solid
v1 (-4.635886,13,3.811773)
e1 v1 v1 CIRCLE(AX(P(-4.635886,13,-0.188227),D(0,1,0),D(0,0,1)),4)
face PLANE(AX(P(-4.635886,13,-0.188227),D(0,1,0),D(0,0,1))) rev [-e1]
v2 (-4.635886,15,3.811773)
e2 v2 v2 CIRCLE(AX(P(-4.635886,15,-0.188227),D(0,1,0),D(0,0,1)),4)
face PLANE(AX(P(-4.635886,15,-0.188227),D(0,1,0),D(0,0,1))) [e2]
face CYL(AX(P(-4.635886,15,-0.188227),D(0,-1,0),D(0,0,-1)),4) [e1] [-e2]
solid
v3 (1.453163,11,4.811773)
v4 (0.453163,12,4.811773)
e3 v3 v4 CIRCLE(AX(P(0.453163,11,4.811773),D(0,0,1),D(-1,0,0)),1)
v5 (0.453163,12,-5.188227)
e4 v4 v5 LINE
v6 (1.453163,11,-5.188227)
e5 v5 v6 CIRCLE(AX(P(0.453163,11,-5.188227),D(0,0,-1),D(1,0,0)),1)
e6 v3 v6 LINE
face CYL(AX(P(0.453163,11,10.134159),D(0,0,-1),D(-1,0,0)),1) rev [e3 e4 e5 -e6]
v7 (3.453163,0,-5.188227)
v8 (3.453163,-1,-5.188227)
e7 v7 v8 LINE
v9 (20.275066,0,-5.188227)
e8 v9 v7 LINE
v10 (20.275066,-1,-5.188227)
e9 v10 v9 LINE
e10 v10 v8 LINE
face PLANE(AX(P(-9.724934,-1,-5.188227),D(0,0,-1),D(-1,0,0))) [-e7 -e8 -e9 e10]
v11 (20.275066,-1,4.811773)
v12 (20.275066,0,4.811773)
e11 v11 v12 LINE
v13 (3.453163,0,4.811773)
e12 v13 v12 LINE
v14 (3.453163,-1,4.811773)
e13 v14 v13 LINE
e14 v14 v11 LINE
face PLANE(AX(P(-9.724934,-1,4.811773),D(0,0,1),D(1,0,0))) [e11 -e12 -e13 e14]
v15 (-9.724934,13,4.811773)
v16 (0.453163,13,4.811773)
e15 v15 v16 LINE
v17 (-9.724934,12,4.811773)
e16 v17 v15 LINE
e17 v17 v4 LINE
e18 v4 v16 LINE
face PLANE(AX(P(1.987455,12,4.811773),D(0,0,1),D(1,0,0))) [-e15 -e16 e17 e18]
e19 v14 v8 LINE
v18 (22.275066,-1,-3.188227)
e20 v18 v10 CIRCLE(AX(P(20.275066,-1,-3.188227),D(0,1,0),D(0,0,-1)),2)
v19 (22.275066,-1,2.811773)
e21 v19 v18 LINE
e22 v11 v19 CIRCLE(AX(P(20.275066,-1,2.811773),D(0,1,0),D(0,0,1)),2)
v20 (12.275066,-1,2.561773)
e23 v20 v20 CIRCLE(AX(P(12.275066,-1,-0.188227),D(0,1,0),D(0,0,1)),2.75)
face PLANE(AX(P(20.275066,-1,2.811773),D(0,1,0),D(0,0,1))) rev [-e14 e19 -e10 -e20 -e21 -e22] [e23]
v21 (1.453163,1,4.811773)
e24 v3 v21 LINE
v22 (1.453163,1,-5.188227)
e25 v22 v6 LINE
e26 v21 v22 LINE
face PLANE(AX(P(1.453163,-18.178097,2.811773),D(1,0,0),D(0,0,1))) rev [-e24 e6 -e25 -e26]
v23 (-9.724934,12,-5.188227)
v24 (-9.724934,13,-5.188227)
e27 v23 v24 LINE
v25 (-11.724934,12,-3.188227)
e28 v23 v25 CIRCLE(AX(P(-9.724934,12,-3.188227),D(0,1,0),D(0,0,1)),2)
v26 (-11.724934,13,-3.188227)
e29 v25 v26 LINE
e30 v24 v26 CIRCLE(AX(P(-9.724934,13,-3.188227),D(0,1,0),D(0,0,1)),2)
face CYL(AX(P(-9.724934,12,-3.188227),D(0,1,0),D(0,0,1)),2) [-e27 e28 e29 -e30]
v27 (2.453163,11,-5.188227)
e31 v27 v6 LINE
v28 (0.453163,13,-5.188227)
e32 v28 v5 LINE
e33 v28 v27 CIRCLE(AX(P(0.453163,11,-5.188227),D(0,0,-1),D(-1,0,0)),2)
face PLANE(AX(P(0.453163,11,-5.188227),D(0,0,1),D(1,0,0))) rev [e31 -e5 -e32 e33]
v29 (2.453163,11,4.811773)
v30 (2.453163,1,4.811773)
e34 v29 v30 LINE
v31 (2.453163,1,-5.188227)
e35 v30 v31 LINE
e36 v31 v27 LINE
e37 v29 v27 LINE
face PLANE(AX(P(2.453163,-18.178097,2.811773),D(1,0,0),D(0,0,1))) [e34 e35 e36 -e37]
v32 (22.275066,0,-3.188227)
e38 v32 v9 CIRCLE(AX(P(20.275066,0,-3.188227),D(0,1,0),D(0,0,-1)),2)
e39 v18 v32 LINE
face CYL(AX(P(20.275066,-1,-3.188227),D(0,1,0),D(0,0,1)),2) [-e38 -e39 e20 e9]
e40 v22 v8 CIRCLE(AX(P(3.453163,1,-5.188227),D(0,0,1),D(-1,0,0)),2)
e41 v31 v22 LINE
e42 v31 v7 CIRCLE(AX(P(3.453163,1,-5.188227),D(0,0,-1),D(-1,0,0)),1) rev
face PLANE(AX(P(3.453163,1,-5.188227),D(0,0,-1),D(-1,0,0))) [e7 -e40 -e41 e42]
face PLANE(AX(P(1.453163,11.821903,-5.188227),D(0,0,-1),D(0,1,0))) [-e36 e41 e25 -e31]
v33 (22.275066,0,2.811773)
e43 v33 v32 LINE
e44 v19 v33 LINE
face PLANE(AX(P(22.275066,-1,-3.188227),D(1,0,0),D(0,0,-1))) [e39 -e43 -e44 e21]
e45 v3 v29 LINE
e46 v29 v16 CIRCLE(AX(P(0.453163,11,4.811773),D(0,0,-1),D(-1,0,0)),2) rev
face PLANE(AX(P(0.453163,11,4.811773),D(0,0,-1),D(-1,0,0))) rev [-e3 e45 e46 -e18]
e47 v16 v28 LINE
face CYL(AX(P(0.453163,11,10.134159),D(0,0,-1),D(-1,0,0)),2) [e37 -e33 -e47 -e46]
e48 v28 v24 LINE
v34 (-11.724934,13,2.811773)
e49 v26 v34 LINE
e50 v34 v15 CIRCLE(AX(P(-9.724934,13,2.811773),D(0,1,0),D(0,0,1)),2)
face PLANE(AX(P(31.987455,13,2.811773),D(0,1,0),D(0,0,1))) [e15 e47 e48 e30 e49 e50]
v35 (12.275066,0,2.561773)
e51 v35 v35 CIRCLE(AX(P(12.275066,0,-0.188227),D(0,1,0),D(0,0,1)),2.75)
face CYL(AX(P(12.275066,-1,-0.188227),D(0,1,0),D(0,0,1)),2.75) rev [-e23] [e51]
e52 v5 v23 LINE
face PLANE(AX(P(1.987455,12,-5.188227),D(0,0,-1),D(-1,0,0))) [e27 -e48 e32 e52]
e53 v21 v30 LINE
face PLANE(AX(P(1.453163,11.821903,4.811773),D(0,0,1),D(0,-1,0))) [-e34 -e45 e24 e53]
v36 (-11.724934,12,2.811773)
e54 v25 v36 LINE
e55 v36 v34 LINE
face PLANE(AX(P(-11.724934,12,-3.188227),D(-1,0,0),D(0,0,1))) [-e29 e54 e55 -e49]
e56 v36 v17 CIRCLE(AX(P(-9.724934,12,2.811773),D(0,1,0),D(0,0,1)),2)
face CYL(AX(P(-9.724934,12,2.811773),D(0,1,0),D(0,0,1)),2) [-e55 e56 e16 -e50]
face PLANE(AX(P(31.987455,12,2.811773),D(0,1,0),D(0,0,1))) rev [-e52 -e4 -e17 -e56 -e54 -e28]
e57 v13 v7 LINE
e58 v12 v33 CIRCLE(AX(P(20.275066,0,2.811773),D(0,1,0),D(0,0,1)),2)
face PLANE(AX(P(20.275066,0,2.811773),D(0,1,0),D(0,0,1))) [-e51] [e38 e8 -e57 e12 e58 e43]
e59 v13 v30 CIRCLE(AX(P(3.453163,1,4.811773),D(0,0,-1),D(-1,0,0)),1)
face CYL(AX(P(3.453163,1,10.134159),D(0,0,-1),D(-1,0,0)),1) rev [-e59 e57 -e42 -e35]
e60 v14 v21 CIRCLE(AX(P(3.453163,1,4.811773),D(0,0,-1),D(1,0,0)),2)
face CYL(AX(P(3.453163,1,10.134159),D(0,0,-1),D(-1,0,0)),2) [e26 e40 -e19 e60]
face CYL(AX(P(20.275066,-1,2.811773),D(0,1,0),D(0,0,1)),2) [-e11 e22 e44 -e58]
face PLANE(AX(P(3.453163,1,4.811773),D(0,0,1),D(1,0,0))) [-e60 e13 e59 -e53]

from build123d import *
from build123d.topology import SkipClean

# Parameters (mm, degrees)
SKETCH1_R           = 2.75
BASE_FLANGE1_DEPTH  = 1
JOG1_START          = -5.188227046
JOG1_DEPTH          = 10
JOG1_START_2        = -3.188227046
JOG1_2_DEPTH        = 6
JOG1_START_3        = 11
JOG1_3_DEPTH        = 1.974011807
JOG1_4_OUTLINE_W    = 1
JOG1_4_OUTLINE_H    = 2
JOG1_4_DEPTH        = 11.152182036
JOG1_START_4        = 12
JOG1_5_DEPTH        = 1
JOG1_6_DEPTH        = 10
JOG1_7_DEPTH        = 10
SKETCH7_R           = 4
BOSS_EXTRUDE2_DEPTH = 2


with BuildPart() as part:
    # Base-Flange1: sheet metal written as solids
    # Sketch1 → Base-Flange1 (new body)
    with BuildSketch(Plane(origin=(0, 0, 0), x_dir=(1, 0, 0), z_dir=(0, 1, 0))):
        with BuildLine():
            Line((-9.72493422, 5.188227046), (20.27506578, 5.188227046))
            ThreePointArc((20.27506578, 5.188227046), (21.689279343, 4.602440608), (22.27506578, 3.188227046))
            Line((22.27506578, 3.188227046), (22.27506578, -2.811772954))
            ThreePointArc((22.27506578, -2.811772954), (21.689279343, -4.225986516), (20.27506578, -4.811772954))
            Line((20.27506578, -4.811772954), (-9.72493422, -4.811772954))
            ThreePointArc((-9.72493422, -4.811772954), (-11.139147782, -4.225986516), (-11.72493422, -2.811772954))
            Line((-11.72493422, -2.811772954), (-11.72493422, 3.188227046))
            ThreePointArc((-11.72493422, 3.188227046), (-11.139147782, 4.602440608), (-9.72493422, 5.188227046))
        make_face()
        with Locations(Location((12.27506578, 0.188227046, 0), (0, 0, 270))):
            Circle(SKETCH1_R, mode=Mode.SUBTRACT)
    extrude(amount=-BASE_FLANGE1_DEPTH)

    # Jog1: read off the stored shape, not the designer's step
    # Jog1 outline → Jog1 (cut)
    with BuildSketch(Plane.XY.offset(JOG1_START)):
        with BuildLine():
            ThreePointArc((3.453163025, -1), (2.453163025, -0.732050807), (1.721112218, 0))
            Line((1.721112218, 0), (-11.72493422, 0))
            Line((-11.72493422, 0), (-11.72493422, -1))
            Line((-11.72493422, -1), (3.453163025, -1))
        make_face()
    extrude(amount=JOG1_DEPTH, mode=Mode.SUBTRACT)

    # Jog1 2 outline → Jog1 2 (add)
    with BuildSketch(Plane.XY.offset(JOG1_START_2)):
        with BuildLine():
            Line((1.453163025, 11), (1.453163025, 1))
            ThreePointArc((1.453163025, 1), (1.521311373, 0.48236191), (1.721112218, 0))
            Line((1.721112218, 0), (3.453163025, 0))
            ThreePointArc((3.453163025, 0), (2.746056244, 0.292893219), (2.453163025, 1))
            Line((2.453163025, 1), (2.453163025, 11))
            ThreePointArc((2.453163025, 11), (1.867376588, 12.414213563), (0.453163025, 13))
            Line((0.453163025, 13), (-11.72493422, 13))
            Line((-11.72493422, 13), (-11.72493422, 12))
            Line((-11.72493422, 12), (0.453163025, 12))
            ThreePointArc((0.453163025, 12), (1.160269807, 11.707106782), (1.453163025, 11))
        make_face()
    extrude(amount=JOG1_2_DEPTH)

    # Jog1 3 outline → Jog1 3 (add)
    with BuildSketch(Plane(origin=(0, 0, 0), x_dir=(1, 0, 0), z_dir=(0, 1, 0)).offset(JOG1_START_3)):
        with BuildLine():
            Line((2.453163025, -4.811772954), (2.453163025, -2.811772954))
            Line((2.453163025, -2.811772954), (-11.72493422, -2.811772954))
            ThreePointArc((-11.72493422, -2.811772954), (-11.139147782, -4.225986516), (-9.72493422, -4.811772954))
            Line((-9.72493422, -4.811772954), (2.453163025, -4.811772954))
        make_face()
        with BuildLine():
            Line((-11.72493422, 3.188227046), (2.453163025, 3.188227046))
            Line((2.453163025, 3.188227046), (2.453163025, 5.188227046))
            Line((2.453163025, 5.188227046), (-9.72493422, 5.188227046))
            ThreePointArc((-9.72493422, 5.188227046), (-11.139147782, 4.602440608), (-11.72493422, 3.188227046))
        make_face()
    extrude(amount=JOG1_3_DEPTH)

    # Jog1 4 outline → Jog1 4 (add)
    with BuildSketch(Plane(origin=(0, 0, 0), x_dir=(1, 0, 0), z_dir=(0, 1, 0))):
        with Locations((1.953163025, -3.811772954)):
            Rectangle(JOG1_4_OUTLINE_W, JOG1_4_OUTLINE_H)
        with Locations((1.953163025, 4.188227046)):
            Rectangle(JOG1_4_OUTLINE_W, JOG1_4_OUTLINE_H)
    extrude(amount=JOG1_4_DEPTH)

    # Jog1 5 outline → Jog1 5 (add)
    with BuildSketch(Plane(origin=(0, 0, 0), x_dir=(1, 0, 0), z_dir=(0, 1, 0)).offset(JOG1_START_4)):
        with BuildLine():
            Line((-9.72493422, -4.811772954), (1.453163025, -4.811772954))
            Line((1.453163025, -4.811772954), (1.453163025, -2.811772954))
            Line((1.453163025, -2.811772954), (-11.72493422, -2.811772954))
            ThreePointArc((-11.72493422, -2.811772954), (-11.139147782, -4.225986516), (-9.72493422, -4.811772954))
        make_face()
        with BuildLine():
            Line((-11.72493422, 3.188227046), (1.453163025, 3.188227046))
            Line((1.453163025, 3.188227046), (1.453163025, 5.188227046))
            Line((1.453163025, 5.188227046), (-9.72493422, 5.188227046))
            ThreePointArc((-9.72493422, 5.188227046), (-11.139147782, 4.602440608), (-11.72493422, 3.188227046))
        make_face()
    extrude(amount=JOG1_5_DEPTH)

    # Jog1 6 outline → Jog1 6 (cut)
    with SkipClean():  # the faces are left unmerged after this step: merging them gives an invalid solid
        with BuildSketch(Plane.XY.offset(JOG1_START)):
            with BuildLine():
                ThreePointArc((2.453163024, -0.732050806), (2.038949462, -0.414213561), (1.721112218, 0))
                ThreePointArc((1.721112218, 0), (1.521311373, 0.48236191), (1.453163025, 1))
                Line((1.453163025, 1), (1.453163025, 11))
                ThreePointArc((1.453163025, 11), (1.160269807, 11.707106782), (0.453163025, 12))
                Line((0.453163025, 12), (-13, 12))
                Line((-13, 12), (-13, -2))
                Line((-13, -2), (2.453163024, -2))
                Line((2.453163024, -2), (2.453163024, -0.732050806))
            make_face()
            with BuildLine():
                Line((2.453163025, 12.974011807), (1.453163025, 12.974011807))
                Line((1.453163025, 12.974011807), (1.453163025, 13))
                Line((1.453163025, 13), (1.453163017, 14))
                Line((1.453163017, 14), (-13, 14))
                Line((-13, 14), (-13, 12.999999997))
                Line((-13, 12.999999997), (0.453163025, 13))
                ThreePointArc((0.453163025, 13), (1.867376588, 12.414213563), (2.453163025, 11))
                Line((2.453163025, 11), (2.453163025, 12.974011807))
            make_face()
        extrude(amount=JOG1_6_DEPTH, mode=Mode.SUBTRACT)
    add(part.part.scale(1), mode=Mode.REPLACE)  # the faces are merged on a copy

    # Jog1 7 outline → Jog1 7 (add)
    with SkipClean():  # the faces are left unmerged after this step: merging them gives an invalid solid
        with BuildSketch(Plane.XY.offset(JOG1_START)):
            with BuildLine():
                Line((2.453163022, 0), (2.453163024, -0.732050806))
                ThreePointArc((2.453163024, -0.732050806), (2.935524934, -0.931851652), (3.453163025, -1))
                Line((3.453163025, -1), (5, -1.000000001))
                Line((5, -1.000000001), (5, -1e-09))
                Line((5, -1e-09), (3.453163025, 0))
                ThreePointArc((3.453163025, 0), (2.746056244, 0.292893219), (2.453163025, 1))
                Line((2.453163025, 1), (2.453163022, 0))
            make_face()
        extrude(amount=JOG1_7_DEPTH)
    add(part.part.scale(1), mode=Mode.REPLACE)  # the faces are merged on a copy


with BuildPart() as body_2:
    # Sketch7 → Boss-Extrude2 (new body)
    with BuildSketch(Plane(origin=(0, 13, 0), x_dir=(1, 0, 0), z_dir=(0, 1, 0))):
        with Locations(Location((-4.635885597, 0.188227046, 0), (0, 0, 270))):
            Circle(SKETCH7_R)
    extrude(amount=BOSS_EXTRUDE2_DEPTH)


solid = Compound([part.part, body_2.part])
